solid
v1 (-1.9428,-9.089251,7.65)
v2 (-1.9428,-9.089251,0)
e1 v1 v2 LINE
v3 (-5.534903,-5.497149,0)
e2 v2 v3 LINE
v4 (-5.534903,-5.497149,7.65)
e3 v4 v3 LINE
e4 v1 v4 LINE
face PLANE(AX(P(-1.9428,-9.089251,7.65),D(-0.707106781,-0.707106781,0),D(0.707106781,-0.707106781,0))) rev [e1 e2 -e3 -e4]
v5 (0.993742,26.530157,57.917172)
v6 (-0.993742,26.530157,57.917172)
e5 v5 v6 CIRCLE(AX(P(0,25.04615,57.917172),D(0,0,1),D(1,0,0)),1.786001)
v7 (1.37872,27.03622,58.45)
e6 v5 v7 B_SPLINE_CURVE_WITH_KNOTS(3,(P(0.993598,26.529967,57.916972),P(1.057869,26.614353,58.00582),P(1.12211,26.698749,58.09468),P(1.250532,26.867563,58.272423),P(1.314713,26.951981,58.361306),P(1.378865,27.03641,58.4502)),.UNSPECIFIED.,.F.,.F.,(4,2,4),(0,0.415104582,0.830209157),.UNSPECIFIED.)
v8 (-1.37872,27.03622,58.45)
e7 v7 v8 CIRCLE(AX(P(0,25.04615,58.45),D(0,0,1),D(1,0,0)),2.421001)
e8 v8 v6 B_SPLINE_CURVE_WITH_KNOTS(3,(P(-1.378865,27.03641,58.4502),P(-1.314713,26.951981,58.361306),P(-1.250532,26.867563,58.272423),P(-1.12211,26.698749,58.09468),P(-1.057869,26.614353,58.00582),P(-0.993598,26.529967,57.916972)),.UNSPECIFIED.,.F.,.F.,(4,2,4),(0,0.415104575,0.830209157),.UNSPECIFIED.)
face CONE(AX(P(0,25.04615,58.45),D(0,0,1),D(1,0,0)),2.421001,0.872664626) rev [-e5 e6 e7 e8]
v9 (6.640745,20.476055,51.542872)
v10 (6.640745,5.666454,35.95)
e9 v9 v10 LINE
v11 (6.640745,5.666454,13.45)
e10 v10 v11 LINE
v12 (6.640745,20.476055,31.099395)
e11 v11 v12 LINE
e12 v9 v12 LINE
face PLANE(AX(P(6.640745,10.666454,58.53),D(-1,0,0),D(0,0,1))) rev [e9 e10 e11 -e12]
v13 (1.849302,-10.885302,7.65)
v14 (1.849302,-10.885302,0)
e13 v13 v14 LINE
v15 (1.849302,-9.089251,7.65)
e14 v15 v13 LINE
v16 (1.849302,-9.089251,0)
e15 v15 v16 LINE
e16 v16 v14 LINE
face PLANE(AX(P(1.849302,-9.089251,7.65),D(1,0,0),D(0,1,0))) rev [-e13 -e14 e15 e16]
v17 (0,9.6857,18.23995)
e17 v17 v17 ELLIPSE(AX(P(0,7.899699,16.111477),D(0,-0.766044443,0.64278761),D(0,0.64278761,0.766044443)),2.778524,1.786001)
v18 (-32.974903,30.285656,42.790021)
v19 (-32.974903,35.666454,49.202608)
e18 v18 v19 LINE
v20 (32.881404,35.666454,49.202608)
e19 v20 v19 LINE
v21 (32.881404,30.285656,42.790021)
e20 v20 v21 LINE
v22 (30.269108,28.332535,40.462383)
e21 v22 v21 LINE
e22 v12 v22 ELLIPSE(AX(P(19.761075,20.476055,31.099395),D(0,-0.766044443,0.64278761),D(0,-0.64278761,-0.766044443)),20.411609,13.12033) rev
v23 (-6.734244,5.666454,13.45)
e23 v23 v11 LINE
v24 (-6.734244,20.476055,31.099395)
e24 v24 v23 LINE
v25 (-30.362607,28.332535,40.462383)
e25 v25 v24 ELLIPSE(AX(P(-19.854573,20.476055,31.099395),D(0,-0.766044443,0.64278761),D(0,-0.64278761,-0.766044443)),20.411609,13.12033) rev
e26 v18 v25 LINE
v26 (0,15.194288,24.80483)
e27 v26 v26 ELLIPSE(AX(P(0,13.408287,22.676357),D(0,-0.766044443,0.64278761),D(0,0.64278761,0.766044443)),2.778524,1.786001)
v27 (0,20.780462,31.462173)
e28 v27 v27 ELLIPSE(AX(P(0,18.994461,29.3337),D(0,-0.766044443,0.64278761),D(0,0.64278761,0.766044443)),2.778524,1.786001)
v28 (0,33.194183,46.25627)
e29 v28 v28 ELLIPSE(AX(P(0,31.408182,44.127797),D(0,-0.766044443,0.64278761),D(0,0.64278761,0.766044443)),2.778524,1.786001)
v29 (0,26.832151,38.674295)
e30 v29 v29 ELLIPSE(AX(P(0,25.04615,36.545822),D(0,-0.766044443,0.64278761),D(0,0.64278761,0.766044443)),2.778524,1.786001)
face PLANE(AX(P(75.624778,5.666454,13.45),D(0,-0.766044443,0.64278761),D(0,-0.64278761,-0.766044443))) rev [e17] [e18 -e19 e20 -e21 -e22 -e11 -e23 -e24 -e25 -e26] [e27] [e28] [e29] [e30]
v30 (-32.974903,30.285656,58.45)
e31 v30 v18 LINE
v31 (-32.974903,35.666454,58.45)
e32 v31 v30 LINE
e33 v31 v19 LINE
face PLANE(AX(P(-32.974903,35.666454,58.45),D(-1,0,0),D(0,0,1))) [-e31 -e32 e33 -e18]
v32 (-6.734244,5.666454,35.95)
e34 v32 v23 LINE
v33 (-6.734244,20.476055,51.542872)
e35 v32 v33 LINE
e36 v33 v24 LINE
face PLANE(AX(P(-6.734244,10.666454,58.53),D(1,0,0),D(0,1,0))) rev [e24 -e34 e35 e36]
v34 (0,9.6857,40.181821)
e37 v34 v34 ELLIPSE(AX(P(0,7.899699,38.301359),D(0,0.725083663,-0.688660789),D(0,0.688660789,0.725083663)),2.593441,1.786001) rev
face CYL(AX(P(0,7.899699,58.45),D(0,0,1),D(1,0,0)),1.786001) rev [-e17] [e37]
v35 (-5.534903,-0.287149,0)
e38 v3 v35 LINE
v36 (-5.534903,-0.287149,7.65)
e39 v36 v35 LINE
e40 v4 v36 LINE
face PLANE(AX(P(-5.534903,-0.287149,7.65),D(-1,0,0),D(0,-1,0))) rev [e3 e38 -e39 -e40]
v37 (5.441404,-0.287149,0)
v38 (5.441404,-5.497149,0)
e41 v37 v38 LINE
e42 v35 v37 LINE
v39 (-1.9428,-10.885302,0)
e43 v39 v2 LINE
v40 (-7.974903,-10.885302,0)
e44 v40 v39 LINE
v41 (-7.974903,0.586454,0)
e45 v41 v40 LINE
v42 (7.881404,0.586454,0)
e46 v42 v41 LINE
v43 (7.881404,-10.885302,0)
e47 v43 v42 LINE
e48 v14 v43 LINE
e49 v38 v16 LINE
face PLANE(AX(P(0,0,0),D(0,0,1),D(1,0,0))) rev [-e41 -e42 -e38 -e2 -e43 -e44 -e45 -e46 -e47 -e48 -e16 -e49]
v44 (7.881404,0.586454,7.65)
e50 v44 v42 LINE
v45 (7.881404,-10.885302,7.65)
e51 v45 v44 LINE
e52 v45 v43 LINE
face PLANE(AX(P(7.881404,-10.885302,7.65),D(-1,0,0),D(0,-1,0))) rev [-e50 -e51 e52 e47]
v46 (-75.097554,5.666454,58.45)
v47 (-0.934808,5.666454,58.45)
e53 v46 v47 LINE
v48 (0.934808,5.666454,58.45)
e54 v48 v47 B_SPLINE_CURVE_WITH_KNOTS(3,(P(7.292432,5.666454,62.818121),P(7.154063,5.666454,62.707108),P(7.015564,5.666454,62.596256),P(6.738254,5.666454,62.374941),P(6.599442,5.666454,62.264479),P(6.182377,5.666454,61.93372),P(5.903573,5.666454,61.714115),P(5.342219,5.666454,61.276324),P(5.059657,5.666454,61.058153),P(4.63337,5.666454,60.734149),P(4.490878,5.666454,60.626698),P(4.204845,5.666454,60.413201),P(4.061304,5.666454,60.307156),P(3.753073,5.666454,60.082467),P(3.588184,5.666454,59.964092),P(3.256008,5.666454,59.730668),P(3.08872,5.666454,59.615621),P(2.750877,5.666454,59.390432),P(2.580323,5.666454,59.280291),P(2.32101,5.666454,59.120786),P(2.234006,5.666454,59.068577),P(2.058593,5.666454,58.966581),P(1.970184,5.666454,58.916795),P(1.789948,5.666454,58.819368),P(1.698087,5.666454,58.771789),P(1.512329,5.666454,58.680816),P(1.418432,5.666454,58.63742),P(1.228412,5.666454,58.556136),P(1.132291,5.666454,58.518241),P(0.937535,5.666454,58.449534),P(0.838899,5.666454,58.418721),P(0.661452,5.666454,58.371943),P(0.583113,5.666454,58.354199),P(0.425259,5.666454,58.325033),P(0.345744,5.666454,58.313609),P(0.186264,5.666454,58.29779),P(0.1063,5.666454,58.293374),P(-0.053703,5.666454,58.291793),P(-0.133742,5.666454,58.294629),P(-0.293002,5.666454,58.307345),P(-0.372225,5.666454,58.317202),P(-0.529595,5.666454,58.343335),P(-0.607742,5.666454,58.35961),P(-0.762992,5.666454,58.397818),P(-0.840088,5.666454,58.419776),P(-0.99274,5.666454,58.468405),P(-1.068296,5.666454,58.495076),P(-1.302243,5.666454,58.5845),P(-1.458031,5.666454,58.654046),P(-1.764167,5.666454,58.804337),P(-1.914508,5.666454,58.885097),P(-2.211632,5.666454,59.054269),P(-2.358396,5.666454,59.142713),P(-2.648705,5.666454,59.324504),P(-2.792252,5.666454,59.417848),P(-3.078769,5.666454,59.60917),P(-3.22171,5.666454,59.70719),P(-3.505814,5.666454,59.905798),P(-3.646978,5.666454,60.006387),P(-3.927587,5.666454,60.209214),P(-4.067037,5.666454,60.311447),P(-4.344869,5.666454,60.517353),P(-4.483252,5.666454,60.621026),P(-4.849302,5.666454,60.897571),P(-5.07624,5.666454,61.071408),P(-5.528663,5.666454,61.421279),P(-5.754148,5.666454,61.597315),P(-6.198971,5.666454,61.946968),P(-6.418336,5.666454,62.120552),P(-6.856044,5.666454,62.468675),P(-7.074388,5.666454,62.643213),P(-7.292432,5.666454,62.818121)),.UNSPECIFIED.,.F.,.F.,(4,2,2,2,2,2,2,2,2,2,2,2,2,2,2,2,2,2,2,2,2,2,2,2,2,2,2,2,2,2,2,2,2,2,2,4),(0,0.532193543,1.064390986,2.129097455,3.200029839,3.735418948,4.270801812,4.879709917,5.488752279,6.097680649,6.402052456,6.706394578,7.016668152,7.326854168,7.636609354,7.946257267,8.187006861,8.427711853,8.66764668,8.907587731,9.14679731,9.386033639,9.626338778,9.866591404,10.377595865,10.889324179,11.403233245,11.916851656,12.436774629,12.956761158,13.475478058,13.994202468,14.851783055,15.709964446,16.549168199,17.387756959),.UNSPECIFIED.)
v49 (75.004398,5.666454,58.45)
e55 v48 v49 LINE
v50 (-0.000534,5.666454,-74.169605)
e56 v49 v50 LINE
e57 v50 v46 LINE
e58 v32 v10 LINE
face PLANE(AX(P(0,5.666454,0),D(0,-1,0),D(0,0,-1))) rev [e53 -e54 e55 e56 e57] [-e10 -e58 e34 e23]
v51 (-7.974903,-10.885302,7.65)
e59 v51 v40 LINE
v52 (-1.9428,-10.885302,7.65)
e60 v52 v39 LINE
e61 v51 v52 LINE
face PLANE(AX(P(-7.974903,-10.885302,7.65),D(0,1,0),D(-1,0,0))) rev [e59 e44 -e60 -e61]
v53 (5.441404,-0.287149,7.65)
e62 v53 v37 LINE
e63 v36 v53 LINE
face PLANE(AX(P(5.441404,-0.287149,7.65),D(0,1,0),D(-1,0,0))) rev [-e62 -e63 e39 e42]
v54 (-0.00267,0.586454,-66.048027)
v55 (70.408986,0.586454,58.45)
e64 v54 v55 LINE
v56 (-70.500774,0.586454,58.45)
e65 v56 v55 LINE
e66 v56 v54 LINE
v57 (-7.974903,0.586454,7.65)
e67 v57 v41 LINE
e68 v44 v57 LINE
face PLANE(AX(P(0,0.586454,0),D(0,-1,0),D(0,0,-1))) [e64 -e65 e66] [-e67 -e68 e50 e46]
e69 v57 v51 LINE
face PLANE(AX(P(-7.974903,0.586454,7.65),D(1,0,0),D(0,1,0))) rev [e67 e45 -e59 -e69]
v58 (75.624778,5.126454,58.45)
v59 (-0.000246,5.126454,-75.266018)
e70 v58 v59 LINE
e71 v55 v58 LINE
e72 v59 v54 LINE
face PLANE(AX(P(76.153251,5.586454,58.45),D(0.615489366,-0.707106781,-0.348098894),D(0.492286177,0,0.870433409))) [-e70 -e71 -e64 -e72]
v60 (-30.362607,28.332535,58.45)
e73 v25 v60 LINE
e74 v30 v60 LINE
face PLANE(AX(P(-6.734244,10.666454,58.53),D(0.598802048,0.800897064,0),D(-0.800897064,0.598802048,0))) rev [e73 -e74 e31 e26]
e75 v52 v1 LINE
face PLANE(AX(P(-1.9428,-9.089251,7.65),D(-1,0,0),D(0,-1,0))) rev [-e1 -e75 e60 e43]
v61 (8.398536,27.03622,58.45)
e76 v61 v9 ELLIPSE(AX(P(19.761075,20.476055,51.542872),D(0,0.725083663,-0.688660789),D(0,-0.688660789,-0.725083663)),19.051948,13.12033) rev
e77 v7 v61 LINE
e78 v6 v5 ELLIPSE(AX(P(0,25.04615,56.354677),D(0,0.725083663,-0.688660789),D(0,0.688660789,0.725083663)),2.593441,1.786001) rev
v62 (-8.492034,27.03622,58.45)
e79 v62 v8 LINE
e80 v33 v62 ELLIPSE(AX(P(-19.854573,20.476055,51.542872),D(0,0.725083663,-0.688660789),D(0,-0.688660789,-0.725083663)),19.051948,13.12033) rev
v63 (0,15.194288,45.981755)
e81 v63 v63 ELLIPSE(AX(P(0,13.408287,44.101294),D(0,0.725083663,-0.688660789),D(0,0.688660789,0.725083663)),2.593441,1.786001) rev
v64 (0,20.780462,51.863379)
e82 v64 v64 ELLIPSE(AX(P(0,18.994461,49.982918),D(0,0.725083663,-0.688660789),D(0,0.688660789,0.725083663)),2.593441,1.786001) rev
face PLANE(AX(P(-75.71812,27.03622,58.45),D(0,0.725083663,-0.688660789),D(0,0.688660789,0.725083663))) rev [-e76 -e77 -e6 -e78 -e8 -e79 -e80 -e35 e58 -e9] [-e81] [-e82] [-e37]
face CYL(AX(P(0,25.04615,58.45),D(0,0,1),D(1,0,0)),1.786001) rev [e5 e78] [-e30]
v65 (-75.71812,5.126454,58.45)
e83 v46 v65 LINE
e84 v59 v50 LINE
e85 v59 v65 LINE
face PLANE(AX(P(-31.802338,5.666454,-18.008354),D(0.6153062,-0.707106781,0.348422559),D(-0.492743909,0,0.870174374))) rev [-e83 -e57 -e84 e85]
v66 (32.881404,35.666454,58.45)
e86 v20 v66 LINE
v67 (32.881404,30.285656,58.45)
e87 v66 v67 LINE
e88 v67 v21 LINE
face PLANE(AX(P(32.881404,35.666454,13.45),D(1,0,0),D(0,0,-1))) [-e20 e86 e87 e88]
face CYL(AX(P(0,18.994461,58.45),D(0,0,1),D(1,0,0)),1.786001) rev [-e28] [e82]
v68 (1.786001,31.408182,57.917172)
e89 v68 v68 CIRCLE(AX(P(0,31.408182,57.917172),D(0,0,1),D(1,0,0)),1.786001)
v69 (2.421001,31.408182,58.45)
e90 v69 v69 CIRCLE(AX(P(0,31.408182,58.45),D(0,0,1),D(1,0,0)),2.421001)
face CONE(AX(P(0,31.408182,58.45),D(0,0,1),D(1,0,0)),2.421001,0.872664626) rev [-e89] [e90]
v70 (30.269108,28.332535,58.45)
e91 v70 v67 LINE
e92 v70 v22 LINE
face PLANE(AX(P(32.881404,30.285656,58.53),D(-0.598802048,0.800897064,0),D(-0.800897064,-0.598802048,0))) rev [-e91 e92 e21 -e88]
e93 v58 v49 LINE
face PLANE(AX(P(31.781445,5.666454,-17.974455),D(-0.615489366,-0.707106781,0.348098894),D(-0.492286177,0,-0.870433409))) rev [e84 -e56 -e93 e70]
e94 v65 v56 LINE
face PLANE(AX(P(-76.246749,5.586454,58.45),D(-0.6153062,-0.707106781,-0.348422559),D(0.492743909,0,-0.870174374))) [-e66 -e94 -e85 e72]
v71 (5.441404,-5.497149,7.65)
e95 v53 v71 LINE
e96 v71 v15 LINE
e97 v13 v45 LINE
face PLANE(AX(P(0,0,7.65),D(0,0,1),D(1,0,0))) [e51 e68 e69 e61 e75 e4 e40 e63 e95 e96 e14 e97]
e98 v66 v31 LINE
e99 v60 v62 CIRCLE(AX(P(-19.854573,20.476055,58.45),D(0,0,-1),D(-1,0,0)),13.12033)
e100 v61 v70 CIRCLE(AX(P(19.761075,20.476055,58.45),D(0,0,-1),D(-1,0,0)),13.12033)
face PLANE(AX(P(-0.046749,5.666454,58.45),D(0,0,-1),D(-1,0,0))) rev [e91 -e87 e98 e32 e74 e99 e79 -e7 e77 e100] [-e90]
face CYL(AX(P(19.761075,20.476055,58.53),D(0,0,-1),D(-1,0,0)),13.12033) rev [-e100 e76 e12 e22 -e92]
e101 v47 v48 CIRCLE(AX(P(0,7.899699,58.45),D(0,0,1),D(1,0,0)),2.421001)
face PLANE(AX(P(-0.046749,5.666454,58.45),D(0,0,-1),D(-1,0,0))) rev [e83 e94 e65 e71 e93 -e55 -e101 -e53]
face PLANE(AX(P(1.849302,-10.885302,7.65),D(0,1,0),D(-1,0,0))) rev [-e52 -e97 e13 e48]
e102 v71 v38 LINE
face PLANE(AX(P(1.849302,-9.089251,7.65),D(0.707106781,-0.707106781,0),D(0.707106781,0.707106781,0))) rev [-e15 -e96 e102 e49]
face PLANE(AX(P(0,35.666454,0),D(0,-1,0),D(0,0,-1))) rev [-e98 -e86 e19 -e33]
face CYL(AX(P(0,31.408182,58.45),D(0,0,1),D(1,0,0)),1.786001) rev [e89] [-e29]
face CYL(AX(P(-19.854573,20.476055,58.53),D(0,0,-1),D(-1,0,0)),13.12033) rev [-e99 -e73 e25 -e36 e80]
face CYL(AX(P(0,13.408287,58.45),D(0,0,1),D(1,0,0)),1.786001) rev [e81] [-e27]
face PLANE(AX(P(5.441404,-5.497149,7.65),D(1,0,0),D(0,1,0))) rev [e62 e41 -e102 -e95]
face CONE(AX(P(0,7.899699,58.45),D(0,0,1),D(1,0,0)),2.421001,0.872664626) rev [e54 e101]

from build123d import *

# Parameters (mm, degrees)
BOSS_EXTRUDE1_DEPTH                       = 7.65
BOSS_EXTRUDE2_DEPTH                       = 5.08
CHAMFER1_SIZE                             = 1
CHAMFER2_SIZE                             = 1
CHAMFER3_SIZE                             = 5
CHAMFER4_SIZE                             = 5
BOSS_EXTRUDE3_DEPTH                       = 30
CUT_EXTRUDE1_DEPTH                        = 45.08
CUT_EXTRUDE3_DEPTH                        = 45.08
CUT_EXTRUDE4_DEPTH                        = 118.13273671
CUT_EXTRUDE4_DEPTH_BACK                   = 118.13273671
F_9_64_0_14063_DIAMETER_HOLE1_D           = 3.572002
F_9_64_0_14063_DIAMETER_HOLE1_CSINK_D     = 4.842002
F_9_64_0_14063_DIAMETER_HOLE1_CSINK_ANGLE = 100
CUT_EXTRUDE5_DEPTH                        = 118.132626096
CUT_EXTRUDE5_DEPTH_BACK                   = 118.132626096


with BuildPart() as part:
    # Sketch2 → Boss-Extrude1 (new body)
    with BuildSketch(Plane.XY):
        Polygon((-7.97490293, 0.58645445), (-7.97490293, -10.885302369), (-1.942800482, -10.885302369), (-1.942800482, -9.089251145), (-5.53490293, -5.497148696), (-5.53490293, -0.387148696), (-5.53490293, -0.287148696), (5.441404415, -0.287148696), (5.441404415, -0.387148696), (5.441404415, -5.497148696), (1.849301966, -9.089251145), (1.849301966, -10.885302369), (7.881404415, -10.885302369), (7.881404415, 0.58645445), align=None)
    extrude(amount=BOSS_EXTRUDE1_DEPTH)

    # Sketch3 → Boss-Extrude2 (add)
    with BuildSketch(Plane(origin=(0, 0.58645445, 0), x_dir=(1, 0, 0), z_dir=(0, 1, 0))):
        Polygon((-0.046749258, -58.45), (76.153250742, -58.45), (0, 76.2), (-76.246749258, -58.45), align=None)
    extrude(amount=BOSS_EXTRUDE2_DEPTH)

    # Chamfer1
    chamfer1_edges = [part.edges().sort_by_distance(p)[0] for p in [
        (38.076625371, 5.66645445, -8.875),
    ]]
    chamfer(chamfer1_edges, length=CHAMFER1_SIZE)

    # Chamfer2
    chamfer2_edges = [part.edges().sort_by_distance(p)[0] for p in [
        (-38.410764077, 5.66645445, -8.367476866),
    ]]
    chamfer(chamfer2_edges, length=CHAMFER2_SIZE)

    # Chamfer3
    # the kernel refuses this chamfer: 5 mm, written as the material it takes off along each edge
    with BuildSketch(Plane(origin=(6.335905635, 0.58645445, -87.389063167), x_dir=(-0.023926207208635007, 0.9996219169112968, -0.013548425709062981), z_dir=(-0.49274390851198024, 0, 0.8701743736885943))) as chamfer3_piece_1:
        Polygon((CHAMFER3_SIZE * 0.999621916911, -CHAMFER3_SIZE * 0.0274958766106), (-CHAMFER3_SIZE * 0.0274958766106, -CHAMFER3_SIZE * 0.999621916911), (0, 0), align=None)
    extrude(amount=180.455930537, mode=Mode.SUBTRACT)

    # Chamfer4
    # the kernel refuses this chamfer: 5 mm, written as the material it takes off along each edge
    with BuildSketch(Plane(origin=(82.483270671, 0.58645445, 69.642393956), x_dir=(-0.8701043132999969, -0.02749587661058631, 0.49210005156081454), z_dir=(-0.49228617663900415, 0, -0.870433409451953))) as chamfer4_piece_1:
        Polygon((CHAMFER4_SIZE * 0.999621916911, CHAMFER4_SIZE * 0.0274958766106), (-CHAMFER4_SIZE * 0.0274958766106, CHAMFER4_SIZE * 0.999621916911), (0, 0), align=None)
    extrude(amount=174.577450859, mode=Mode.SUBTRACT)

    # Sketch4 → Boss-Extrude3 (add)
    with BuildSketch(Plane(origin=(0, 5.66645445, 0), x_dir=(1, 0, 0), z_dir=(0, 1, 0))):
        Polygon((-7.97490293, -13.45), (7.881404415, -13.45), (32.881404415, -13.45), (32.881404415, -58.45), (7.881404415, -58.45), (-7.97490293, -58.45), (-32.97490293, -58.45), (-32.97490293, -13.45), align=None)
    extrude(amount=BOSS_EXTRUDE3_DEPTH)

    # Sketch5 → Cut-Extrude1 (cut)
    with BuildSketch(Plane(origin=(0, 0, 13.45), x_dir=(-1, 0, 0), z_dir=(0, 0, -1))):
        Polygon((-6.640745102, 5.66645445), (-32.881404415, 5.66645445), (-32.881404415, 30.285655528), (-6.640745102, 10.66645445), align=None)
        Polygon((6.734243618, 10.66645445), (6.734243618, 5.66645445), (32.97490293, 5.66645445), (32.97490293, 30.285655528), align=None)
    extrude(amount=-CUT_EXTRUDE1_DEPTH, mode=Mode.SUBTRACT)

    # Sketch7 → Cut-Extrude3 (cut)
    with BuildSketch(Plane(origin=(0, 0, 13.45), x_dir=(-1, 0, 0), z_dir=(0, 0, -1))):
        with BuildLine():
            Line((-6.640745102, 20.476054989), (-6.640745102, 10.66645445))
            Line((-6.640745102, 10.66645445), (-11.048165512, 10.66645445))
            ThreePointArc((-11.048165512, 10.66645445), (-31.728933629, 25.853173581), (-6.640745102, 20.476054989))
        make_face()
        with BuildLine():
            Line((6.734243618, 20.476054989), (6.734243618, 10.66645445))
            Line((6.734243618, 10.66645445), (11.141664027, 10.66645445))
            ThreePointArc((11.141664027, 10.66645445), (31.822432144, 25.853173581), (6.734243618, 20.476054989))
        make_face()
    extrude(amount=-CUT_EXTRUDE3_DEPTH, mode=Mode.SUBTRACT)

    # Sketch9 → Cut-Extrude4 (cut, two sides: drawn at the far end of the back side and taken through both)
    with BuildSketch(Plane.ZY.offset(6.734243618).offset(-CUT_EXTRUDE4_DEPTH_BACK)):
        Polygon((13.45, 5.66645445), (49.202607778, 35.66645445), (13.45, 35.66645445), align=None)
    extrude(amount=CUT_EXTRUDE4_DEPTH + CUT_EXTRUDE4_DEPTH_BACK, mode=Mode.SUBTRACT)

    # 9/64 (0.14063) Diameter Hole1 (through all)
    with Locations(Plane.XY.offset(58.45)):
        with Locations((0, 31.40818219), (0, 25.046150321), (0, 18.994461471), (0, 13.408287148), (0, 7.899698579)):
            CounterSinkHole(F_9_64_0_14063_DIAMETER_HOLE1_D / 2, F_9_64_0_14063_DIAMETER_HOLE1_CSINK_D / 2, counter_sink_angle=F_9_64_0_14063_DIAMETER_HOLE1_CSINK_ANGLE)

    # Sketch13 → Cut-Extrude5 (cut, two sides: drawn at the far end of the back side and taken through both)
    with BuildSketch(Plane(origin=(6.640745102, 0, 0), x_dir=(0, 0, -1), z_dir=(1, 0, 0)).offset(-CUT_EXTRUDE5_DEPTH_BACK)):
        Polygon((-58.45, 27.036219817), (-35.95, 5.66645445), (-58.45, 5.66645445), align=None)
    extrude(amount=CUT_EXTRUDE5_DEPTH + CUT_EXTRUDE5_DEPTH_BACK, mode=Mode.SUBTRACT)


solid = part.part
